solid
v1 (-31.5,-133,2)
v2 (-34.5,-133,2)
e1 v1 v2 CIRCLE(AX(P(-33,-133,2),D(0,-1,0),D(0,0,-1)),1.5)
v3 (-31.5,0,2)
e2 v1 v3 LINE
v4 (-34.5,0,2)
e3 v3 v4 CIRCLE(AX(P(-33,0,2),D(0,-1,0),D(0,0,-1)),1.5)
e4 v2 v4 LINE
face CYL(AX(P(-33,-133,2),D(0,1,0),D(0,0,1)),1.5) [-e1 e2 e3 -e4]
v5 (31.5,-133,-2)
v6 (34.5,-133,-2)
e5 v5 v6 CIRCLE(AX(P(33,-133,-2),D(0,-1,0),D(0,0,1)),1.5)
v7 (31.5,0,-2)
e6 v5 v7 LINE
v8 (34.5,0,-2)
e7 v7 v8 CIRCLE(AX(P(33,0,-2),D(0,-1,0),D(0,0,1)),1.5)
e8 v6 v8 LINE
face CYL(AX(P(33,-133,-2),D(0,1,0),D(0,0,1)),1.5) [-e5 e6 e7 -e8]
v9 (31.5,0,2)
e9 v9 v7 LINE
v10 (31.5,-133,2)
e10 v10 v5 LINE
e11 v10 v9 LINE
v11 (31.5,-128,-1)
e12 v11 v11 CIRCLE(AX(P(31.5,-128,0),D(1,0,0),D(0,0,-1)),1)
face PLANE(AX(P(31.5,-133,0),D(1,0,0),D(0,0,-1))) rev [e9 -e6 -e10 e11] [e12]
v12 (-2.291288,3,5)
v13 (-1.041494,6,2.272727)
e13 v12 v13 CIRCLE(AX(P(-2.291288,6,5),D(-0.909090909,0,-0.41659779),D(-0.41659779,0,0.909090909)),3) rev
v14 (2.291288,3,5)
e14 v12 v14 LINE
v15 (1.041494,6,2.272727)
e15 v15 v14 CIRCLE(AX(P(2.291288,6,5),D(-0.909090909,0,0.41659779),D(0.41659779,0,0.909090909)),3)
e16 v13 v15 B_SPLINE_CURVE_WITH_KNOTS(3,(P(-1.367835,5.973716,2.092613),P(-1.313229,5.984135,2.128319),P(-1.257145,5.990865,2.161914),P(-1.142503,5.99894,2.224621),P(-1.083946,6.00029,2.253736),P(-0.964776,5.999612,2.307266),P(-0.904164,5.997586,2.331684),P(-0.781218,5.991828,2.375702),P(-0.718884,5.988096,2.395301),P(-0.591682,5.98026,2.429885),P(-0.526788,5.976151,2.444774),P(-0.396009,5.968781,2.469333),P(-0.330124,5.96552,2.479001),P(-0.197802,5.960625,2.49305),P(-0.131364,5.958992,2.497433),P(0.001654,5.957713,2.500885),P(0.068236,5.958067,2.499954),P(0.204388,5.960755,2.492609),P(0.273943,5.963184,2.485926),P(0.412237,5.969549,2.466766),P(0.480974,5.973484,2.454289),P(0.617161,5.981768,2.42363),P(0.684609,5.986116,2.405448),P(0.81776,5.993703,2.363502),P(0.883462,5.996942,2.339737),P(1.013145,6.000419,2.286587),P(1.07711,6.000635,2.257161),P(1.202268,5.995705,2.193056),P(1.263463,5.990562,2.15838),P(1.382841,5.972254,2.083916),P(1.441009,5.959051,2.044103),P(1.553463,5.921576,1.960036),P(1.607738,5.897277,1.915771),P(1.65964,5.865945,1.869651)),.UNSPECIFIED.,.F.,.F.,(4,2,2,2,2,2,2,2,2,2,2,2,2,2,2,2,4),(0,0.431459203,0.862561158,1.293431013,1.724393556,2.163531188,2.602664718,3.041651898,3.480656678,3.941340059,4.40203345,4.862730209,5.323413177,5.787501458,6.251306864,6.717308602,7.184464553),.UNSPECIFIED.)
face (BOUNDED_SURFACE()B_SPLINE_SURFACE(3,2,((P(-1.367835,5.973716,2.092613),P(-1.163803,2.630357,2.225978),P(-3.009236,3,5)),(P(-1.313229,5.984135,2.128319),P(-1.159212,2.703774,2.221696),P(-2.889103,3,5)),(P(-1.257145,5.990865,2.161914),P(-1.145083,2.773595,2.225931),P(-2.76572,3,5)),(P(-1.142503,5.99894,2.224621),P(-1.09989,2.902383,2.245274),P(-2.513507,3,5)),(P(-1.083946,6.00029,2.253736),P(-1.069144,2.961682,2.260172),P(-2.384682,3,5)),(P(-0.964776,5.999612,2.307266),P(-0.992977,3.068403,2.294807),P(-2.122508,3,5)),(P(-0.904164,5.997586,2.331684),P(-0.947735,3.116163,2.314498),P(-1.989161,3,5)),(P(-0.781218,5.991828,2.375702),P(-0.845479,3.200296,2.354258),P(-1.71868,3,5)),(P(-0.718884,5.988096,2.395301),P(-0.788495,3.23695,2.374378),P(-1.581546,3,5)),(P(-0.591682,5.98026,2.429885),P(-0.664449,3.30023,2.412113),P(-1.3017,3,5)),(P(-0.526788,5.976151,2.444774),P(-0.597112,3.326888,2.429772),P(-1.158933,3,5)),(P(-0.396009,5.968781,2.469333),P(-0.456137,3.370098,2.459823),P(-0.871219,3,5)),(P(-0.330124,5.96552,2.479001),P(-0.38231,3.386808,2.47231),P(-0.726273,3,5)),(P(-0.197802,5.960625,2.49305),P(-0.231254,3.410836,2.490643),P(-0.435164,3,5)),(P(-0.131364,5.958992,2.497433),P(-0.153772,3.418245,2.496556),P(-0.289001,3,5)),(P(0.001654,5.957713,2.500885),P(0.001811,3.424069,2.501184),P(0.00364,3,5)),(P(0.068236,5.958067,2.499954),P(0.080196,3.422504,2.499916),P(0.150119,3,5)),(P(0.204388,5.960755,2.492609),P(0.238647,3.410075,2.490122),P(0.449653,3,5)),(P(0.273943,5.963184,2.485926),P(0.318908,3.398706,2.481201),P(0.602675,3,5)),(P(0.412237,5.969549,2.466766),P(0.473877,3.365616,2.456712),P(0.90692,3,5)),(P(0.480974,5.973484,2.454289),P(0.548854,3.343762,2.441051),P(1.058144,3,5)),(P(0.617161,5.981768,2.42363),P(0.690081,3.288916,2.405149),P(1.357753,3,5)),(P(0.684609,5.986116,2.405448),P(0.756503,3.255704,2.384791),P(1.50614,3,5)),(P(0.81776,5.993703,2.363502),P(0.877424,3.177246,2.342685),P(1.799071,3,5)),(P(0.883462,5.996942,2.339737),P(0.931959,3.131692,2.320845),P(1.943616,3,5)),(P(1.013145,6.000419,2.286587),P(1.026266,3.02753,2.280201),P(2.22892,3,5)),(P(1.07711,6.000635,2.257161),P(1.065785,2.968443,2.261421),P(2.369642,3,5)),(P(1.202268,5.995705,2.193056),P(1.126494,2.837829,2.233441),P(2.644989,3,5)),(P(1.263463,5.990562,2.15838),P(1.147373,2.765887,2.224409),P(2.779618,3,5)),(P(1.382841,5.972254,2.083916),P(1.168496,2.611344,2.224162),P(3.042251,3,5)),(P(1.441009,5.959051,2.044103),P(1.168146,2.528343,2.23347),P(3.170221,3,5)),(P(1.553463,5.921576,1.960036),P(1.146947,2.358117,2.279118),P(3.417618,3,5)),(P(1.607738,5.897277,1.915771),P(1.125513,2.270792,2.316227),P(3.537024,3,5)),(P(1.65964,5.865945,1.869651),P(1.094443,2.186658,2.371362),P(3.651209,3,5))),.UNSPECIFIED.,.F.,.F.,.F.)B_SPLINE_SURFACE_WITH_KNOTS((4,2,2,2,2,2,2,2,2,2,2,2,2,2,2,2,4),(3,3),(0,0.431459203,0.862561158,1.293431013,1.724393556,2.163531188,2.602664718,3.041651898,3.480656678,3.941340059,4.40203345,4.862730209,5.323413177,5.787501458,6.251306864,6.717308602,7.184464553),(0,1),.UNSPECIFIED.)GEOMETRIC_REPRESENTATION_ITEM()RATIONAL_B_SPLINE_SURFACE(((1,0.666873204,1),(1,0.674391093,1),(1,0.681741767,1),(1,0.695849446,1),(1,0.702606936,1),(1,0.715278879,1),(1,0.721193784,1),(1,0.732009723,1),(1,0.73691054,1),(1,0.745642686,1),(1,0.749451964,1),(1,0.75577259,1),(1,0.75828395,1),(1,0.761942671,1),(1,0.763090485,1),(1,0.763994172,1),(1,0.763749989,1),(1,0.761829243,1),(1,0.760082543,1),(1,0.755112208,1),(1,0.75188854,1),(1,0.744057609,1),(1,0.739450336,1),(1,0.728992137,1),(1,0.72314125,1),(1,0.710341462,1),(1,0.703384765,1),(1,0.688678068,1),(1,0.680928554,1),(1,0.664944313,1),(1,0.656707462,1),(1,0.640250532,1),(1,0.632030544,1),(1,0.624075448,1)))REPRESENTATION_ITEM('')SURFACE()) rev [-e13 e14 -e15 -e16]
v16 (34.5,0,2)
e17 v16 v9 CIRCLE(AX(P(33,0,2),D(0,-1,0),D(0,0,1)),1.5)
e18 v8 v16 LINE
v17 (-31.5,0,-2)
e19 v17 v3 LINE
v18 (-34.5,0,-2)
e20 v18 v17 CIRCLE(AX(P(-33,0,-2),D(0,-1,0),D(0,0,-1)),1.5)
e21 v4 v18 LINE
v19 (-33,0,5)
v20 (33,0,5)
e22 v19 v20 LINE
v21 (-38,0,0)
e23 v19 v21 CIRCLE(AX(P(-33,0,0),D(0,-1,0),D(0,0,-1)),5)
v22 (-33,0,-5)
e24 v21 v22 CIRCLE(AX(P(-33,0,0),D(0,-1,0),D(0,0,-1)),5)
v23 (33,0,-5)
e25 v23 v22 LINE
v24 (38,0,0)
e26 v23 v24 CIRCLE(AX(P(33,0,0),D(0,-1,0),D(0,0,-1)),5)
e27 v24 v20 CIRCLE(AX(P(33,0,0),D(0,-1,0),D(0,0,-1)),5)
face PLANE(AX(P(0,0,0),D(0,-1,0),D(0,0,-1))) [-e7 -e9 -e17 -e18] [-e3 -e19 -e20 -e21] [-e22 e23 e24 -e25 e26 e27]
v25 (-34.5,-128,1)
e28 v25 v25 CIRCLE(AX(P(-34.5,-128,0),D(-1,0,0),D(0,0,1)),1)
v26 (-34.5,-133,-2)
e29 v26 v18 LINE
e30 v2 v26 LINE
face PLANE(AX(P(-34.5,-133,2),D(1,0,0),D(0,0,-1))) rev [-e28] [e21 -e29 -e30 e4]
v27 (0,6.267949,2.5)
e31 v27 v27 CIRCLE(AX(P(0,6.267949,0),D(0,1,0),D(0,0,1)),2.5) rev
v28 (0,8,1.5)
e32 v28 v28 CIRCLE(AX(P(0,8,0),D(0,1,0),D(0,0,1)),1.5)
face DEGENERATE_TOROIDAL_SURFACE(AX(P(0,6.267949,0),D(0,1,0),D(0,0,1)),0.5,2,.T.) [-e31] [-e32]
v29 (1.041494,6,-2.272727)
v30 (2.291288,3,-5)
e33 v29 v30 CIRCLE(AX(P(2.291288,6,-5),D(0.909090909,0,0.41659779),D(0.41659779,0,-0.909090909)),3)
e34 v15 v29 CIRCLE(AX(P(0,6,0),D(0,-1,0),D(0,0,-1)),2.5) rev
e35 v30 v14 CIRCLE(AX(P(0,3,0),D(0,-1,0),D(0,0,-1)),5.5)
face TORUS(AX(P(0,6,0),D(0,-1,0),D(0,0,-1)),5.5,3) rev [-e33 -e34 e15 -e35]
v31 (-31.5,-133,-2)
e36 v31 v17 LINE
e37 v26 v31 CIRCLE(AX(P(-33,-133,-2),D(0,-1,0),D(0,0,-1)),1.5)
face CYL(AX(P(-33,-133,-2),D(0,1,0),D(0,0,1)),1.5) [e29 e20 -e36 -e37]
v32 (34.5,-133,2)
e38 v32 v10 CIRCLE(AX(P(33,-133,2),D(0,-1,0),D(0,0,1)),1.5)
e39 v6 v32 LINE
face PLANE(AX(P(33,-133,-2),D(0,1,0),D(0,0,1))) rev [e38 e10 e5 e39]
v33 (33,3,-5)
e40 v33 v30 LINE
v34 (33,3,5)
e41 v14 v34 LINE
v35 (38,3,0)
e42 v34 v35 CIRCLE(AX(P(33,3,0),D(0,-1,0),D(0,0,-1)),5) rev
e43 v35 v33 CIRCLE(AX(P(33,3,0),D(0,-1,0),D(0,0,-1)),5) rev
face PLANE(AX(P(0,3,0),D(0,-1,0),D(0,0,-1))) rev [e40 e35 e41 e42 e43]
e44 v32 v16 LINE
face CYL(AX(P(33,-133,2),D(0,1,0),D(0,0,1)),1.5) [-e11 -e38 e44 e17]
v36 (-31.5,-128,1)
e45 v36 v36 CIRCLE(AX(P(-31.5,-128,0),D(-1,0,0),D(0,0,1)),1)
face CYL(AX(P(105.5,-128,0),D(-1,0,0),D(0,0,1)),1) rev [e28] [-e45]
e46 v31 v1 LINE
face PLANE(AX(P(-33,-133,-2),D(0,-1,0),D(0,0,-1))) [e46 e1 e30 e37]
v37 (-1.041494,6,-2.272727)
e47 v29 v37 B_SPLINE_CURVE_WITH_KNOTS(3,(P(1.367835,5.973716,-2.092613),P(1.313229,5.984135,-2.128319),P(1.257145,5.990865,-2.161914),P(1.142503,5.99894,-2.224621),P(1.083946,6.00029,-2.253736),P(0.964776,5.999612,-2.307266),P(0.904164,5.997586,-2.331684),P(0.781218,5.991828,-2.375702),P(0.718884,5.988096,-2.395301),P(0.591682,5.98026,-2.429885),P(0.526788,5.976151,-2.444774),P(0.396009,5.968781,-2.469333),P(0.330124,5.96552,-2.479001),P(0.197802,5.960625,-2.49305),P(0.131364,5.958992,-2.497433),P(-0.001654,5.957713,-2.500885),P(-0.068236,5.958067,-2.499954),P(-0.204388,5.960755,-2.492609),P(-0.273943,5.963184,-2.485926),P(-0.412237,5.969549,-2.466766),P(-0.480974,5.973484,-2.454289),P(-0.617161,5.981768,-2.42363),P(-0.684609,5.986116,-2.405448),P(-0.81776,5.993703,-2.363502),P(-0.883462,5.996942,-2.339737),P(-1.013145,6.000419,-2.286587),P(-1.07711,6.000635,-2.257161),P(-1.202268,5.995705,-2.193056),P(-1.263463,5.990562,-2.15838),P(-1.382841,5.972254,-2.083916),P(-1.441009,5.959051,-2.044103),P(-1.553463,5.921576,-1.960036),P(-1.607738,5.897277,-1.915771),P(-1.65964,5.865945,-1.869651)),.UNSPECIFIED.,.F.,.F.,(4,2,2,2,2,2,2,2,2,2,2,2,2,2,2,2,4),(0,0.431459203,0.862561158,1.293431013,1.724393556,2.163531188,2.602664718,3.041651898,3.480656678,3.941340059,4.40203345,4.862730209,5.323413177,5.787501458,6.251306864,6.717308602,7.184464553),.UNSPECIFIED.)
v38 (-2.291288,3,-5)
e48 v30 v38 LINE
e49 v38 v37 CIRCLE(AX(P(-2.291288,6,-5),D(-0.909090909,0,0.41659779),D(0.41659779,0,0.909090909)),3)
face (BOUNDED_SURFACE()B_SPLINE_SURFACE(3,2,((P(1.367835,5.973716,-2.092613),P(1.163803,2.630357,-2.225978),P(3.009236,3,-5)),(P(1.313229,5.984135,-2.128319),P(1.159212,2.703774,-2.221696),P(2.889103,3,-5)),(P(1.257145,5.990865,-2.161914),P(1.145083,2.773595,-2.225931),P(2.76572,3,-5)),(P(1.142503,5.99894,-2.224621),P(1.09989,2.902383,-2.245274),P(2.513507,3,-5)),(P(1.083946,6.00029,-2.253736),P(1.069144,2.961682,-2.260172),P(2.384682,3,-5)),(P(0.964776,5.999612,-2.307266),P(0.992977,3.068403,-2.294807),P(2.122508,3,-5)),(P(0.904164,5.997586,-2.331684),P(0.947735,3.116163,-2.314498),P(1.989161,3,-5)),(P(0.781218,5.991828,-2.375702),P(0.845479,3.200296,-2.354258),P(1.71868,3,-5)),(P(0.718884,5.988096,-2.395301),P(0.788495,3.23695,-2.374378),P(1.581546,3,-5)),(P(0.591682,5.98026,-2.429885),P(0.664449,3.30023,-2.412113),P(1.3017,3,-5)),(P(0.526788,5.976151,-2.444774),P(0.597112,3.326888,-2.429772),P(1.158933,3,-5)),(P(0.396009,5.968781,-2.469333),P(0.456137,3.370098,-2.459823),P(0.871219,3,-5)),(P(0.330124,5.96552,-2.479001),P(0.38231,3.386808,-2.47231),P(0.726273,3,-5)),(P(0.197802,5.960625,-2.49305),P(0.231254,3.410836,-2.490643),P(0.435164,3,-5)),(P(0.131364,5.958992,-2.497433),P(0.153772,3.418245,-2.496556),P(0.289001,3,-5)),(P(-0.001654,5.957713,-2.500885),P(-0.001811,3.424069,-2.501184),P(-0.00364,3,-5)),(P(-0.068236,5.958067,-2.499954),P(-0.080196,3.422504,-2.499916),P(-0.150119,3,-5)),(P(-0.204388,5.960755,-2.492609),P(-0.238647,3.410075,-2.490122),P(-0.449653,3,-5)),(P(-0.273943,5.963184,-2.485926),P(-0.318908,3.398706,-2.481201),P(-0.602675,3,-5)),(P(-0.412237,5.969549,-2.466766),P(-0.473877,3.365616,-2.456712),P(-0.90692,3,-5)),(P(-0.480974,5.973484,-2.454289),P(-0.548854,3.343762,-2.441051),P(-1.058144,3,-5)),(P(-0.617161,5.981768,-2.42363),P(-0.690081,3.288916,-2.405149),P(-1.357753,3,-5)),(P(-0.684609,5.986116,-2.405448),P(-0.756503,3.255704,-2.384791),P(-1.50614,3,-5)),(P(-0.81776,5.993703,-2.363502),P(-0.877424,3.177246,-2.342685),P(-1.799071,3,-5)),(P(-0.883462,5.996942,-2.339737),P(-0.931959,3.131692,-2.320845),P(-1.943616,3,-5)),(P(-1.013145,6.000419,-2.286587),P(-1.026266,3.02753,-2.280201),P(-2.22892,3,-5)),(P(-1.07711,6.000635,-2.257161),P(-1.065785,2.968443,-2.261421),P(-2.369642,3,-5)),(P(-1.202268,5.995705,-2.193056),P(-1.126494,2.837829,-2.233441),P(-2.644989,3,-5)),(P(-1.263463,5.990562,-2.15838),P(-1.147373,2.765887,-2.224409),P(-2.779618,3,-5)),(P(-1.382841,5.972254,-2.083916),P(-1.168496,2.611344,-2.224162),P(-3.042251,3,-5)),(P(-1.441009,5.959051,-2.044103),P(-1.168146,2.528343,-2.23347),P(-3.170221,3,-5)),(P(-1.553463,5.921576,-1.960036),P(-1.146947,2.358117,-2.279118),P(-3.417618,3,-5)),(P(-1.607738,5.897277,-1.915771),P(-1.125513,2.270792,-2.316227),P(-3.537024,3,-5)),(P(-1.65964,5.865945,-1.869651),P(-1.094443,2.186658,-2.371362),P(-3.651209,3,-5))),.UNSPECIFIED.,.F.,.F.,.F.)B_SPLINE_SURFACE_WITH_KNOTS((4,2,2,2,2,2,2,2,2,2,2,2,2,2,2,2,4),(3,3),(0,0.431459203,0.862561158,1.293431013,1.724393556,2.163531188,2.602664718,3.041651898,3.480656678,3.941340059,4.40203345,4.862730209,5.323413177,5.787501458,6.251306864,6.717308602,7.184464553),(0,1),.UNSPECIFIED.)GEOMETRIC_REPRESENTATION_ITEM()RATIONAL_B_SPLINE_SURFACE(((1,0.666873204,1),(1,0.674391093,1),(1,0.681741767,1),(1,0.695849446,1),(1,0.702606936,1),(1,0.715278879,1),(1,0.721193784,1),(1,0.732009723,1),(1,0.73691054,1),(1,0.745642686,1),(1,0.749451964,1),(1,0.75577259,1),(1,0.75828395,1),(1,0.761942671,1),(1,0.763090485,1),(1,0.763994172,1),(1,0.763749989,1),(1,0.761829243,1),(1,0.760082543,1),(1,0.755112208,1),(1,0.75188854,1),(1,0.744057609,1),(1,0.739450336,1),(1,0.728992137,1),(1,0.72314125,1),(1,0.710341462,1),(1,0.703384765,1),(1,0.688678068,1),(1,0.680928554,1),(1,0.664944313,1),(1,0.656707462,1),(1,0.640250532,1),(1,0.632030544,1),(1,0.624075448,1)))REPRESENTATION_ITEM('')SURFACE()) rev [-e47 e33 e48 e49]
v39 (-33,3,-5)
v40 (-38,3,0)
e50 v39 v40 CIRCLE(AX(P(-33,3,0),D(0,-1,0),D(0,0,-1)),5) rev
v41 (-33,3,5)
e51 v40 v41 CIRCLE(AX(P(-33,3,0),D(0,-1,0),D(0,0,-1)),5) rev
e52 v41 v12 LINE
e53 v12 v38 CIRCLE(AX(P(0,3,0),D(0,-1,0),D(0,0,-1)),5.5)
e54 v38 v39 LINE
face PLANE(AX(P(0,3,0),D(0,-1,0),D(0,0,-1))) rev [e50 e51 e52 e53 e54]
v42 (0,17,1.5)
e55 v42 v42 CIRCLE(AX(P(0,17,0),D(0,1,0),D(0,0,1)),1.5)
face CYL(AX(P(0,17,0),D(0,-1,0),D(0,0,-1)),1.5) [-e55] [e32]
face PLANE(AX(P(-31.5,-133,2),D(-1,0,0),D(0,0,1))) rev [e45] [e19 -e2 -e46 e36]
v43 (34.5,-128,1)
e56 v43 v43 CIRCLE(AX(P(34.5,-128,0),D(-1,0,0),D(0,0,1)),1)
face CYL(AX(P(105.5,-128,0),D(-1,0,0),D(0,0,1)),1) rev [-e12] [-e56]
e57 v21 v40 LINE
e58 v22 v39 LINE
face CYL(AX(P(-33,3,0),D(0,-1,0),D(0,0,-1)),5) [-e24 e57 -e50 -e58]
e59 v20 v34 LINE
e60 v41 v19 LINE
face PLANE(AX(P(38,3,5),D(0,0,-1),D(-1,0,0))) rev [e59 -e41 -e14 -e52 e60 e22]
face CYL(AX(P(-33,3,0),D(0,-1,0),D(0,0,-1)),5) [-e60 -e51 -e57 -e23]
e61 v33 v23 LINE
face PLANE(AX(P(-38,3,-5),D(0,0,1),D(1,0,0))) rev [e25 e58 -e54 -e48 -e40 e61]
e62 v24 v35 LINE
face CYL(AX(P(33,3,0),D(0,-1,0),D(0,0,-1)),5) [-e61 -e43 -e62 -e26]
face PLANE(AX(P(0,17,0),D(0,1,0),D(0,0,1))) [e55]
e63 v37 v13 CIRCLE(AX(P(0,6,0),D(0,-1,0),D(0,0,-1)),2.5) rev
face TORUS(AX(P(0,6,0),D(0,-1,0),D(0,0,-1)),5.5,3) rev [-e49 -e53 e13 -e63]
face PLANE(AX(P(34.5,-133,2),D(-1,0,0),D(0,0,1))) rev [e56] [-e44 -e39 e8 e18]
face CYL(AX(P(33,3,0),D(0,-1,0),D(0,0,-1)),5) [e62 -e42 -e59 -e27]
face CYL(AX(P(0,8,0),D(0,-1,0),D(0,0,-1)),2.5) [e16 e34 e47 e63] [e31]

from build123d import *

# Parameters (mm, degrees)
SALIENTE_EXTRUIR1_DEPTH = 3
CROQUIS2_R              = 2.5
SALIENTE_EXTRUIR2_DEPTH = 5
CROQUIS3_R              = 1.5
SALIENTE_EXTRUIR3_DEPTH = 9
REDONDEO1_R             = 2
REDONDEO2_R             = 3
REDONDEO3_R             = 5
SALIENTE_EXTRUIR6_DEPTH = 133
CROQUIS7_R              = 1
CORTAR_EXTRUIR6_DEPTH   = 140


# Some blends are built 0.0001 mm under size
with BuildPart() as part:
    # Croquis1 → Saliente-Extruir1 (new body)
    with BuildSketch(Plane(origin=(0, 0, 0), x_dir=(1, 0, 0), z_dir=(0, 1, 0))):
        Polygon((-38, 0), (-38, 5), (0, 5), (38, 5), (38, 0), (38, -5), (0, -5), (-38, -5), align=None)
    extrude(amount=SALIENTE_EXTRUIR1_DEPTH)

    # Croquis2 → Saliente-Extruir2 (add)
    with BuildSketch(Plane(origin=(0, 3, 0), x_dir=(1, 0, 0), z_dir=(0, 1, 0))):
        with Locations(Location((0, 0, 0), (0, 0, 90))):
            Circle(CROQUIS2_R)
    extrude(amount=SALIENTE_EXTRUIR2_DEPTH)

    # Croquis3 → Saliente-Extruir3 (add)
    with BuildSketch(Plane(origin=(0, 8, 0), x_dir=(1, 0, 0), z_dir=(0, 1, 0))):
        with Locations(Location((0, 0, 0), (0, 0, 270))):
            Circle(CROQUIS3_R)
    extrude(amount=SALIENTE_EXTRUIR3_DEPTH)

    # Redondeo1
    # the kernel refuses this fillet: 2 mm, written as the material it takes off along each edge
    with BuildSketch(Plane(origin=(0, 8, 0), x_dir=(0, 0, -1), z_dir=(1, 0, 0))) as redondeo1_piece_1:
        with BuildLine():
            CenterArc((0.5, -1.732050808), REDONDEO1_R, 0, 60)
            Line((1.5, 0), (1.52, 0.034641016))
            ThreePointArc((1.52, 0.034641016), (2, 0.04), (2.5, 0.04))
            Line((2.5, 0.04), (2.54, 0))
            Line((2.54, 0), (2.54, -1.732050808))
            Line((2.54, -1.732050808), (2.5, -1.732050808))
        make_face()
    revolve(axis=Axis((0, 8, 0), (0, 1, 0)), mode=Mode.SUBTRACT)

    # Redondeo2
    redondeo2_edges = [part.edges().sort_by_distance(p)[0] for p in [
        (0, 3, 2.5),
    ]]
    fillet(redondeo2_edges, radius=REDONDEO2_R)

    # Redondeo3
    redondeo3_edges = [part.edges().sort_by_distance(p)[0] for p in [
        (38, 1.5, 5),
        (38, 1.5, -5),
        (-38, 1.5, -5),
        (-38, 1.5, 5),
    ]]
    fillet(redondeo3_edges, radius=REDONDEO3_R - 0.0001)  # a hair under: the kernel refuses the full size

    # Croquis4 → Saliente-Extruir6 (add)
    with BuildSketch(Plane.XZ):
        with BuildLine():
            Line((-31.5, 2), (-31.5, 0))
            Line((-31.5, 0), (-31.5, -2))
            ThreePointArc((-31.5, -2), (-33, -3.5), (-34.5, -2))
            Line((-34.5, -2), (-34.5, 2))
            ThreePointArc((-34.5, 2), (-33, 3.5), (-31.5, 2))
        make_face()
        with BuildLine():
            Line((31.5, 0), (31.5, -2))
            ThreePointArc((31.5, -2), (33, -3.5), (34.5, -2))
            Line((34.5, -2), (34.5, 2))
            ThreePointArc((34.5, 2), (33, 3.5), (31.5, 2))
            Line((31.5, 2), (31.5, 0))
        make_face()
    extrude(amount=SALIENTE_EXTRUIR6_DEPTH)

    # Croquis7 → Cortar-Extruir6 (cut)
    with BuildSketch(Plane.ZY.offset(34.5)):
        with Locations((0, -128)):
            Circle(CROQUIS7_R)
    extrude(amount=-CORTAR_EXTRUIR6_DEPTH, mode=Mode.SUBTRACT)


solid = part.part
